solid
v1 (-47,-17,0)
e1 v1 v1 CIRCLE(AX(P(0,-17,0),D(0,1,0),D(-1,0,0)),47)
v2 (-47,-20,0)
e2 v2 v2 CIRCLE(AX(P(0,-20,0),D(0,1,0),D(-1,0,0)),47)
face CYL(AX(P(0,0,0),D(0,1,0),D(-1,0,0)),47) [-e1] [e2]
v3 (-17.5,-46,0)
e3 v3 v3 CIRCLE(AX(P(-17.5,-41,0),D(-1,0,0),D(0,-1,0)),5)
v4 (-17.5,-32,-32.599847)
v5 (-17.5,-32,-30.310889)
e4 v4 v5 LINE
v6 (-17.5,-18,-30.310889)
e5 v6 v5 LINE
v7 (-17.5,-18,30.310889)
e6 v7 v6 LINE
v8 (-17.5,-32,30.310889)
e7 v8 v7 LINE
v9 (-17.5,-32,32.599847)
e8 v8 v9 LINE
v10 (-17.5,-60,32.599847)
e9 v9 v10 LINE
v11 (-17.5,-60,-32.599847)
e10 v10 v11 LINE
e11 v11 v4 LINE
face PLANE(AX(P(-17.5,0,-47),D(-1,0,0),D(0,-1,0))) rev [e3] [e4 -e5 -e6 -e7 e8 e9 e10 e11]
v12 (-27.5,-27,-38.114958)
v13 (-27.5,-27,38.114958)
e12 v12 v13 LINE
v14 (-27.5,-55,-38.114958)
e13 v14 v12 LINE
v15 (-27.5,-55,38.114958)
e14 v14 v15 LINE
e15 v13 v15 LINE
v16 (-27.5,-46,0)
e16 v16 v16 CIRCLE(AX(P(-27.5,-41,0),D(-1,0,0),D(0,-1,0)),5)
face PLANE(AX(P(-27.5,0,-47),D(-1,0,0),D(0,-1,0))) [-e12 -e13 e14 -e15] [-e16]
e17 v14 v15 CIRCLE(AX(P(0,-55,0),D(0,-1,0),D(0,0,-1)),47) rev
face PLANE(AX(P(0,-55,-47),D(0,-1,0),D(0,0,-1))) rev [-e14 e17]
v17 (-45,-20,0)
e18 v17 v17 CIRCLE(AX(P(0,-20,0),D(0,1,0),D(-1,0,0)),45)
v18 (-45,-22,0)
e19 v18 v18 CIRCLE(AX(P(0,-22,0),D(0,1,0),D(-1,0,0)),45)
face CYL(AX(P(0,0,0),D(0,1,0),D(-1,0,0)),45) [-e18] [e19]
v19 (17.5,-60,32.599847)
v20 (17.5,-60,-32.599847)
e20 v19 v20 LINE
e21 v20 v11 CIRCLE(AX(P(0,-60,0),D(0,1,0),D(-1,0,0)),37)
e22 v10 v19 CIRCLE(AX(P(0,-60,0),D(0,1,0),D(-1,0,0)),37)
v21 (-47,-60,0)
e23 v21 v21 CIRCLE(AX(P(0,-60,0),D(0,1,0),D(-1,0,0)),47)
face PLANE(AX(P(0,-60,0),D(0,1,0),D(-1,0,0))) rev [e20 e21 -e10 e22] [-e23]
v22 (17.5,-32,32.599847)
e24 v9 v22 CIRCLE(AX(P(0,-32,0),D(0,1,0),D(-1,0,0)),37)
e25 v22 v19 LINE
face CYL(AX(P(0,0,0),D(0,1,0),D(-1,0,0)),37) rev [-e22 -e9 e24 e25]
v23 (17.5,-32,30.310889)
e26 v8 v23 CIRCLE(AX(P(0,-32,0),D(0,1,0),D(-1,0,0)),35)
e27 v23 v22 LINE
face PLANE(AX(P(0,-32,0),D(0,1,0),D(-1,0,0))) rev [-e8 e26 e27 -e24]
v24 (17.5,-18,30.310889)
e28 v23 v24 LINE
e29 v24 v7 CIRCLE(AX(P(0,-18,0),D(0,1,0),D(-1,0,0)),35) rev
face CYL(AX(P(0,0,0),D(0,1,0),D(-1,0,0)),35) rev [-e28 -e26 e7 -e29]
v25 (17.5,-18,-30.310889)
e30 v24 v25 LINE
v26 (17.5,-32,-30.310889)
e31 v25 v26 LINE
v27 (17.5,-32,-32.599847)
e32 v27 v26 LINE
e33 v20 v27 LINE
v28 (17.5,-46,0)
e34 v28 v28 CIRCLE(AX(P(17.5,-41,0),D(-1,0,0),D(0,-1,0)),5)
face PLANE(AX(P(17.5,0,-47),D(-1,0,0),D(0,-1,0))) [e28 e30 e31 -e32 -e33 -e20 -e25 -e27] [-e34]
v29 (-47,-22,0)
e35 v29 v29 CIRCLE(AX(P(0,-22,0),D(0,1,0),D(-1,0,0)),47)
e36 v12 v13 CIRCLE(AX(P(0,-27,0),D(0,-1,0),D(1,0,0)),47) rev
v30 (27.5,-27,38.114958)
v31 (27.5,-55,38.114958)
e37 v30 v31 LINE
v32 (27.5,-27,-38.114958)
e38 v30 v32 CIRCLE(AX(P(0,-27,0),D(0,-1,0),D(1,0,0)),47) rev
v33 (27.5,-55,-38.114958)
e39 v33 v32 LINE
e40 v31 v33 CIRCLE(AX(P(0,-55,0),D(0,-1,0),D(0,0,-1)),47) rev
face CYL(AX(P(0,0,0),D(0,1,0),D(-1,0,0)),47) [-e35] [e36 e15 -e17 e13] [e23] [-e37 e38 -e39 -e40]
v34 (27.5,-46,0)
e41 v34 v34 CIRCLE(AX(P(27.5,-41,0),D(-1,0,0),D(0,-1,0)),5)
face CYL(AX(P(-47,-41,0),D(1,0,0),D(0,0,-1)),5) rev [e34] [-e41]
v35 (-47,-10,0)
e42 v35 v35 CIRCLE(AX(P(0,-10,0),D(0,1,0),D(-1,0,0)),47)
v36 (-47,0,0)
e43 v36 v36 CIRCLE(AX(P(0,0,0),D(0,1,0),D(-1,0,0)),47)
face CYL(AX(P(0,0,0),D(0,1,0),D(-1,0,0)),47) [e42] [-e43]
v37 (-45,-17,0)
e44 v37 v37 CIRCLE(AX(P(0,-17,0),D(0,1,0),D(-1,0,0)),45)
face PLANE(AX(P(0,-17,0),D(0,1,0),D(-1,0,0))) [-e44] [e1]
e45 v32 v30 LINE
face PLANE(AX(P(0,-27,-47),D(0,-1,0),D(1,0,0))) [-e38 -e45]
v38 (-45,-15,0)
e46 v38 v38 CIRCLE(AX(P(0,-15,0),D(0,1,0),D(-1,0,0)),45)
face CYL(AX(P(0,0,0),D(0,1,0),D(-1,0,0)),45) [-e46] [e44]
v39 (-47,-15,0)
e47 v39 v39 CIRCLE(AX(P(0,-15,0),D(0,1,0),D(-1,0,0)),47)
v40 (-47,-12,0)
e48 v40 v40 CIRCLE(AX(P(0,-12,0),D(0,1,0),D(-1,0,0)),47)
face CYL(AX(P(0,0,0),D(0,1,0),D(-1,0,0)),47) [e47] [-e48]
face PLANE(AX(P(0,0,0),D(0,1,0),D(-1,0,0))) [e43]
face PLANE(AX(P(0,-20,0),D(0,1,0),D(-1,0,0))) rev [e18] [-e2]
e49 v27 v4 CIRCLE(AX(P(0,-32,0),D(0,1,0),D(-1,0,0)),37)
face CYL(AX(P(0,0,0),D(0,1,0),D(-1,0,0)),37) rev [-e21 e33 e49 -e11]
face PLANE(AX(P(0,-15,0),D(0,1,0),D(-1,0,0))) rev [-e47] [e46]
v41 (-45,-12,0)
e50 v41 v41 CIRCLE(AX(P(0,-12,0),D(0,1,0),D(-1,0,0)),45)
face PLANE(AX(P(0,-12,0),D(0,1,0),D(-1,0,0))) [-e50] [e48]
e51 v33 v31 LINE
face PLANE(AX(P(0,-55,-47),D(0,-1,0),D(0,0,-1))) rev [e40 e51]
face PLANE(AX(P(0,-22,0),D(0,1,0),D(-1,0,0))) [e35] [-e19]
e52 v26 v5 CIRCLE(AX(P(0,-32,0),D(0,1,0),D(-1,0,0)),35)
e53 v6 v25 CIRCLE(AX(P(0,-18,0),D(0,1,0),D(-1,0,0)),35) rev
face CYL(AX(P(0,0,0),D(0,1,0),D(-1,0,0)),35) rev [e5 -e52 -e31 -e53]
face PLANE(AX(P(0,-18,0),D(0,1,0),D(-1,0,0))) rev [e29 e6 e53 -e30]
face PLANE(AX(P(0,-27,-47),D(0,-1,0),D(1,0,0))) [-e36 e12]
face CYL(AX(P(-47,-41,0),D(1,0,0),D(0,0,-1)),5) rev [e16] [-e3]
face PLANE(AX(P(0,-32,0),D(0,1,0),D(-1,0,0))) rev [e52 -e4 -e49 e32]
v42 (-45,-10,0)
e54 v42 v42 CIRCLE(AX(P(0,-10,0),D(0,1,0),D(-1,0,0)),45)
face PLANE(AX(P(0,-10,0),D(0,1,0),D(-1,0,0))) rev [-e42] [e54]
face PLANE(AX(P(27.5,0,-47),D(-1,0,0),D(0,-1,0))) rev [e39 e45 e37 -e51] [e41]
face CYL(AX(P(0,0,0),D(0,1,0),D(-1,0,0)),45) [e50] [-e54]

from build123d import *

# Parameters (mm, degrees)
CUT_EXTRUDE1_DEPTH      = 90.543285622
CUT_EXTRUDE1_DEPTH_BACK = 90.543285622
SKETCH3_W               = 20
SKETCH3_H               = 28
SHELL1_START            = -60
SHELL1_DEPTH            = 50
SHELL1_START_2          = -17
SHELL1_2_DEPTH          = 7
SHELL1_3_DEPTH          = 28
SKETCH4_R               = 41
BOSS_EXTRUDE2_DEPTH     = 18
CUT_EXTRUDE2_DEPTH      = 107.579782323
CUT_EXTRUDE2_DEPTH_BACK = 107.579782323
SKETCH5_R               = 5


# Read off the part's stored shape, not the designer's step: Shell1
with BuildPart() as part:
    # Sketch1 → Revolve1 (revolve)
    with BuildSketch(Plane.XY):
        Polygon((0, -60), (0, 0), (-47, 0), (-47, -10), (-45, -10), (-45, -12), (-47, -12), (-47, -15), (-45, -15), (-45, -17), (-47, -17), (-47, -20), (-45, -20), (-45, -22), (-47, -22), (-47, -60), align=None)
    revolve(axis=Axis((0, 0, 0), (0, -1, 0)))

    # Sketch3 → Cut-Extrude1 (cut, two sides: drawn at the far end of the back side and taken through both)
    with BuildSketch(Plane.XY.offset(-CUT_EXTRUDE1_DEPTH_BACK)):
        with Locations((-37.5, -41)):
            Rectangle(SKETCH3_W, SKETCH3_H)
        with Locations((37.5, -41)):
            Rectangle(SKETCH3_W, SKETCH3_H)
    extrude(amount=CUT_EXTRUDE1_DEPTH + CUT_EXTRUDE1_DEPTH_BACK, mode=Mode.SUBTRACT)

    # Shell1 outline → Shell1 (cut)
    with BuildSketch(Plane(origin=(0, 0, 0), x_dir=(1, 0, 0), z_dir=(0, 1, 0)).offset(SHELL1_START)):
        with BuildLine():
            Line((17.5, -30.310889132), (17.5, 30.310889132))
            ThreePointArc((17.5, 30.310889132), (0, 35), (-17.5, 30.310889132))
            Line((-17.5, 30.310889132), (-17.5, -30.310889132))
            ThreePointArc((-17.5, -30.310889132), (0, -35), (17.5, -30.310889132))
        make_face()
    extrude(amount=SHELL1_DEPTH, mode=Mode.SUBTRACT)

    # Shell1 2 outline → Shell1 2 (cut)
    with BuildSketch(Plane(origin=(0, 0, 0), x_dir=(1, 0, 0), z_dir=(0, 1, 0)).offset(SHELL1_START_2)):
        with BuildLine():
            ThreePointArc((17.5, -30.310889132), (35, 0), (17.5, 30.310889132))
            Line((17.5, 30.310889132), (17.5, -30.310889132))
        make_face()
        with BuildLine():
            Line((-17.5, -30.310889132), (-17.5, 30.310889132))
            ThreePointArc((-17.5, 30.310889132), (-35, 0), (-17.5, -30.310889132))
        make_face()
    extrude(amount=SHELL1_2_DEPTH, mode=Mode.SUBTRACT)

    # Shell1 3 outline → Shell1 3 (cut)
    with BuildSketch(Plane(origin=(0, 0, 0), x_dir=(1, 0, 0), z_dir=(0, 1, 0)).offset(SHELL1_START)):
        with BuildLine():
            Line((17.5, 30.310889132), (17.5, 32.599846625))
            ThreePointArc((17.5, 32.599846625), (0, 37), (-17.5, 32.599846625))
            Line((-17.5, 32.599846625), (-17.5, 30.310889132))
            ThreePointArc((-17.5, 30.310889132), (0, 35), (17.5, 30.310889132))
        make_face()
        with BuildLine():
            Line((17.5, -32.599846625), (17.5, -30.310889132))
            ThreePointArc((17.5, -30.310889132), (0, -35), (-17.5, -30.310889132))
            Line((-17.5, -30.310889132), (-17.5, -32.599846625))
            ThreePointArc((-17.5, -32.599846625), (0, -37), (17.5, -32.599846625))
        make_face()
    extrude(amount=SHELL1_3_DEPTH, mode=Mode.SUBTRACT)

    # Sketch4 → Boss-Extrude2 (add)
    with BuildSketch(Plane(origin=(0, 0, 0), x_dir=(1, 0, 0), z_dir=(0, 1, 0))):
        Circle(SKETCH4_R)
    extrude(amount=-BOSS_EXTRUDE2_DEPTH)

    # Sketch5 → Cut-Extrude2 (cut, two sides: drawn at the far end of the back side and taken through both)
    with BuildSketch(Plane(origin=(27.5, 0, 0), x_dir=(0, 0, -1), z_dir=(1, 0, 0)).offset(-CUT_EXTRUDE2_DEPTH_BACK)):
        with Locations(Location((0, -41, 0), (0, 0, 270))):
            Circle(SKETCH5_R)
    extrude(amount=CUT_EXTRUDE2_DEPTH + CUT_EXTRUDE2_DEPTH_BACK, mode=Mode.SUBTRACT)


solid = part.part
